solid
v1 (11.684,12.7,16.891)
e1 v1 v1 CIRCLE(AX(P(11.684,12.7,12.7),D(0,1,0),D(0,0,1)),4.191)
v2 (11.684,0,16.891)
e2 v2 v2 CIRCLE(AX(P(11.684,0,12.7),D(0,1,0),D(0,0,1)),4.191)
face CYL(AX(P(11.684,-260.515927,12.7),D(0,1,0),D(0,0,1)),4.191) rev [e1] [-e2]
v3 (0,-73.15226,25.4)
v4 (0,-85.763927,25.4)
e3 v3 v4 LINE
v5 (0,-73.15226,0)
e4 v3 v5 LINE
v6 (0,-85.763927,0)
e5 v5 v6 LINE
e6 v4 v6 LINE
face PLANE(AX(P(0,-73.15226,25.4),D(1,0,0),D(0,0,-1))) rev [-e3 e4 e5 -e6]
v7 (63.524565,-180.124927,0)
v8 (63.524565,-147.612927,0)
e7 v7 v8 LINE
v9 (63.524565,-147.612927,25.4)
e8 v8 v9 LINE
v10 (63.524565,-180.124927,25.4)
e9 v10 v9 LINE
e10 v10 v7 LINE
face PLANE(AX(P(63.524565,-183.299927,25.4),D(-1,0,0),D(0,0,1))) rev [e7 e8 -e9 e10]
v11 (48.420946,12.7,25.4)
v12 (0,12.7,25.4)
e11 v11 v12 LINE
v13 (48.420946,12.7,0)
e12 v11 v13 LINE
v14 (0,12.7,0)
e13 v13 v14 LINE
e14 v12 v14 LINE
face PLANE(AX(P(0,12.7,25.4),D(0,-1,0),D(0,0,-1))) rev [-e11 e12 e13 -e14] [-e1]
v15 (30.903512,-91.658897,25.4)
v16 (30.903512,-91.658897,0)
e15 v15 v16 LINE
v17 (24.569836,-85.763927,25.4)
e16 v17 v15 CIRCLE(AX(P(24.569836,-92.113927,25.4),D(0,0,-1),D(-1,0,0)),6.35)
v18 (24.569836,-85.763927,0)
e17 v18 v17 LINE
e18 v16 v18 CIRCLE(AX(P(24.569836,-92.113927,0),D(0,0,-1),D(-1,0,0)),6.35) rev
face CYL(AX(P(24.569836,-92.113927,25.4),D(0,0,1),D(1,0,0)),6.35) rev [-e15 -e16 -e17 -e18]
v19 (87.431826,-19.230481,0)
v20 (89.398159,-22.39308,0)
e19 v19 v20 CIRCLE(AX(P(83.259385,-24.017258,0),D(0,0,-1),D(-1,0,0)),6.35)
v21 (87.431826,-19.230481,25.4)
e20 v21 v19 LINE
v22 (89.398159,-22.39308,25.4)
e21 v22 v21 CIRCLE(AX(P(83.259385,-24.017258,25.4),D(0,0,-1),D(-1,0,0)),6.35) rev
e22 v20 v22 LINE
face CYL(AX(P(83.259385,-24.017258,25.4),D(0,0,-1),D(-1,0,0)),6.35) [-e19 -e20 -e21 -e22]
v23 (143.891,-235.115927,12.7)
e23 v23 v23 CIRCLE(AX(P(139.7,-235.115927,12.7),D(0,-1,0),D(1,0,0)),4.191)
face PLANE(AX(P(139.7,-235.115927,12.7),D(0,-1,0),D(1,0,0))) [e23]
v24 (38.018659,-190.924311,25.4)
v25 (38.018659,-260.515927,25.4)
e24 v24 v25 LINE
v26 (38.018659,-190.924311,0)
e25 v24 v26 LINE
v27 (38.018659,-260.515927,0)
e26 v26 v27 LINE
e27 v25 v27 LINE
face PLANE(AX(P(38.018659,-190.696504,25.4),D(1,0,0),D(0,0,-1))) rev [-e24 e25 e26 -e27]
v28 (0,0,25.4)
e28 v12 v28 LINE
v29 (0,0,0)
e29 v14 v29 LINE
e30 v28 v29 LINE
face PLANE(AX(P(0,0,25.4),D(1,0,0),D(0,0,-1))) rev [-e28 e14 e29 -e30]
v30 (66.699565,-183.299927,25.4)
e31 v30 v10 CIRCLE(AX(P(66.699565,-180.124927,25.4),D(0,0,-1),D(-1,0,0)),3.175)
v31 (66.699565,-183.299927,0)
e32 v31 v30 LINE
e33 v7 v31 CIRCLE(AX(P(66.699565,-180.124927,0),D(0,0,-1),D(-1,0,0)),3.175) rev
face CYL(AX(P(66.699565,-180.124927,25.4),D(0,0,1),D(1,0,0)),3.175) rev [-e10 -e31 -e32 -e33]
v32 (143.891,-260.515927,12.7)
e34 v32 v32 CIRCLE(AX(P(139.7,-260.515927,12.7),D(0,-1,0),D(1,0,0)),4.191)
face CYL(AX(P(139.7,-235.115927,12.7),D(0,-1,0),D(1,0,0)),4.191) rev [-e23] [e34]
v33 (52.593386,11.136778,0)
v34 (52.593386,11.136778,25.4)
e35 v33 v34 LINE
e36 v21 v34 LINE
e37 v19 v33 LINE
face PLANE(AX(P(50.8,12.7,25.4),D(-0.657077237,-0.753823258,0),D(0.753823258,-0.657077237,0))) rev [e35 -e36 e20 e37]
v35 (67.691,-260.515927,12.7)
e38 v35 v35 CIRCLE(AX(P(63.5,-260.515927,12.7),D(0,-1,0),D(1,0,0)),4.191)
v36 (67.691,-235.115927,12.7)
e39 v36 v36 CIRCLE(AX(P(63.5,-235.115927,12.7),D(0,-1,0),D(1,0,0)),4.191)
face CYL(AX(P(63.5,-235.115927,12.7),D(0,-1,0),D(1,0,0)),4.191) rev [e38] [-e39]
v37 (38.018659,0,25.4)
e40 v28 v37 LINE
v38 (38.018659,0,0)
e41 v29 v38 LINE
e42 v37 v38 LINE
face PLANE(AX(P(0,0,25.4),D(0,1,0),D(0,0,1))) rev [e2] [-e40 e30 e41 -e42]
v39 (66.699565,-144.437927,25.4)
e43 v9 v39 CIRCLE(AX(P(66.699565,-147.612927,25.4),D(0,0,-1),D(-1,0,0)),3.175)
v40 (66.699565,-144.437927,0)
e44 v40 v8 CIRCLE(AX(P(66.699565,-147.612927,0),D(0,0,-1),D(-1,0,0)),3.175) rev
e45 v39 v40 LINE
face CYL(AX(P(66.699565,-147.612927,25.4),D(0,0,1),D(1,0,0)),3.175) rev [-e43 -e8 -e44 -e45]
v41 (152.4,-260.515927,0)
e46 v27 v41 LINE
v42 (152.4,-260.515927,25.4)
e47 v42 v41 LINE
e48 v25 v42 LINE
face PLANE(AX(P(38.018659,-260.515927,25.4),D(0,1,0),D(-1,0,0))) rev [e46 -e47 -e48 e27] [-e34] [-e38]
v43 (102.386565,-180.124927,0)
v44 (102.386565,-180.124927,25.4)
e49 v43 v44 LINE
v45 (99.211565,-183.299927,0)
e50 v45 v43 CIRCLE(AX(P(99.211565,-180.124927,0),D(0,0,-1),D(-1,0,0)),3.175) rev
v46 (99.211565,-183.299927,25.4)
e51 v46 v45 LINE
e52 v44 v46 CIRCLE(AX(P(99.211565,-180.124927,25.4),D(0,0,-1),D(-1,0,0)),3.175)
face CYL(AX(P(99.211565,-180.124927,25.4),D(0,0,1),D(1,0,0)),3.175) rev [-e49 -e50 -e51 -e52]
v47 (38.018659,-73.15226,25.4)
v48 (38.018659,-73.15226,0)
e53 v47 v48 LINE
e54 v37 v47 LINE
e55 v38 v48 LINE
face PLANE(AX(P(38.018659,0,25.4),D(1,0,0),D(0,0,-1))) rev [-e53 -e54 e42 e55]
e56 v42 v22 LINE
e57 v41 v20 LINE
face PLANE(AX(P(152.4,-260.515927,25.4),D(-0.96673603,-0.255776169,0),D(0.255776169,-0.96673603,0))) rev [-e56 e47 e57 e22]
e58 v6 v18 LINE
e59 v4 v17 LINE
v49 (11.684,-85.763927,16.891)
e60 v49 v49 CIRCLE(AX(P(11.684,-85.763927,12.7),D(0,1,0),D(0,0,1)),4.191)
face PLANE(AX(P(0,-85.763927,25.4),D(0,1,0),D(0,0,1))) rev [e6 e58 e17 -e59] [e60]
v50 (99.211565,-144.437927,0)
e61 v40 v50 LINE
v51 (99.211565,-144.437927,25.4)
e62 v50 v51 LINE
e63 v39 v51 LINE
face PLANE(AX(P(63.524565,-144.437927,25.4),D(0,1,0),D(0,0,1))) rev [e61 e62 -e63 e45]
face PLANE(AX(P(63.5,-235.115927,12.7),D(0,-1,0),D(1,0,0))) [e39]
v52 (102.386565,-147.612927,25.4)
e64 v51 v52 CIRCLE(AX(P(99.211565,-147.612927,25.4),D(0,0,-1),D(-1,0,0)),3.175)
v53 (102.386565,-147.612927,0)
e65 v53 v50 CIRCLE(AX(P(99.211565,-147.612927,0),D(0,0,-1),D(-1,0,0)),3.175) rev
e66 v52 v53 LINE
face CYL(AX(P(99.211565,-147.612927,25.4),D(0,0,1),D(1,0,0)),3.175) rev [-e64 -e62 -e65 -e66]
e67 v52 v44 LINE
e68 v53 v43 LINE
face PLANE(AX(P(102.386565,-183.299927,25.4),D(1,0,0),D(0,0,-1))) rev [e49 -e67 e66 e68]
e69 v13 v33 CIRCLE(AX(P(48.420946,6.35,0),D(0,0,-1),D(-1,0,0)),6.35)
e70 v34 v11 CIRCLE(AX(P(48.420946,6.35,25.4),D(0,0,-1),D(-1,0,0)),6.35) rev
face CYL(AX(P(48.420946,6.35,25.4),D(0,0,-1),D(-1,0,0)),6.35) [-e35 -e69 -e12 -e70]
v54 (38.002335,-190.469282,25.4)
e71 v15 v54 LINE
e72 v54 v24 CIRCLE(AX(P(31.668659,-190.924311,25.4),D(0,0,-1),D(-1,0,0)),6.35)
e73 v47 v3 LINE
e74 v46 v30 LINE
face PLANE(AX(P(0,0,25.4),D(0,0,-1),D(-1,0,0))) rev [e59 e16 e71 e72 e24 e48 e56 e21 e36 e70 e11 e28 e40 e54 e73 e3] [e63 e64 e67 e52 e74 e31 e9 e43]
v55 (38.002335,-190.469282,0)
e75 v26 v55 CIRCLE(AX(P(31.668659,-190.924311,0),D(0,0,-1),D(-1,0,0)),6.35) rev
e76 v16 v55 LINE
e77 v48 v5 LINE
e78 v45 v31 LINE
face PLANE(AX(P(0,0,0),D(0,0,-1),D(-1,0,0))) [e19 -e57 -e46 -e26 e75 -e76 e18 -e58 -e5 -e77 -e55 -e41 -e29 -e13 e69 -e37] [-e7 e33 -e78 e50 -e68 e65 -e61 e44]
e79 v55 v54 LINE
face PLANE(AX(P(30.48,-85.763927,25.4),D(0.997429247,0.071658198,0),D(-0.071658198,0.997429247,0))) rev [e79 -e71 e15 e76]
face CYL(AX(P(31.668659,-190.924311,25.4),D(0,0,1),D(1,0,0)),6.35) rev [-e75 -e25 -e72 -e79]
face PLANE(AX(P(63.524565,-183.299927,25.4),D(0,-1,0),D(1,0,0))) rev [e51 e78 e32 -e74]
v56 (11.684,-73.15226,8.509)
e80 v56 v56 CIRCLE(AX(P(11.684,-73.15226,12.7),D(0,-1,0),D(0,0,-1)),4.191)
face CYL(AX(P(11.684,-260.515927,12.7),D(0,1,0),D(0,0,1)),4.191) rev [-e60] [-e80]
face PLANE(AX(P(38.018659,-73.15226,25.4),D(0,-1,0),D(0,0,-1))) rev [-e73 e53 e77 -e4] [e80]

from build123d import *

# Parameters (mm, degrees)
BOSS_EXTRUDE1_DEPTH = 25.4
SKETCH2_W           = 38.862
SKETCH2_H           = 38.862
CUT_EXTRUDE1_DEPTH  = 303.885239179
FILLET1_R           = 6.35
FILLET2_R           = 3.175
SKETCH3_R           = 4.191
CUT_EXTRUDE2_DEPTH  = 314.875552812
SKETCH4_R           = 4.191
CUT_EXTRUDE3_DEPTH  = 25.4


with BuildPart() as part:
    # Sketch1 → Boss-Extrude1 (new body)
    with BuildSketch(Plane.XY):
        Polygon((0, 0), (0, 12.7), (50.8, 12.7), (88.9, -20.510228633), (152.4, -260.515926793), (38.018659419, -260.515926793), (38.018659419, -190.696503564), (30.48, -85.763926793), (0, -85.763926793), (0, -73.152260366), (38.018659419, -73.152260366), (38.018659419, 0), align=None)
    extrude(amount=BOSS_EXTRUDE1_DEPTH)

    # Sketch2 → Cut-Extrude1 (cut, through all)
    with BuildSketch(Plane(origin=(0, 0, 0), x_dir=(-1, 0, 0), z_dir=(0, 0, -1))):
        with Locations((-82.955564704, -163.868926793)):
            Rectangle(SKETCH2_W, SKETCH2_H)
    extrude(amount=-CUT_EXTRUDE1_DEPTH, mode=Mode.SUBTRACT)

    # Fillet1
    # the kernel refuses this fillet: 6.35 mm, written as the material it adds along each edge
    with BuildSketch(Plane(origin=(38.018659419, -190.696503564, 0), x_dir=(0, -1, 0), z_dir=(0, 0, 1))) as fillet1_piece_1:
        with BuildLine():
            CenterArc((FILLET1_R * 0.0358752122725, -FILLET1_R), FILLET1_R, 90, 4.109234206)
            Line((-FILLET1_R * 0.0357829859603, -FILLET1_R * 0.00257075307266), (0, 0))
            Line((0, 0), (FILLET1_R * 0.0358752122725, 0))
        make_face()
    extrude(amount=25.4)
    with BuildSketch(Plane(origin=(30.48, -85.763926793, 0), x_dir=(-1, 0, 0), z_dir=(0, 0, 1))) as fillet1_piece_2:
        with BuildLine():
            CenterArc((FILLET1_R * 0.930734490318, FILLET1_R), FILLET1_R, 184.109234206, 85.890765794)
            Line((-FILLET1_R * 0.0666947566093, FILLET1_R * 0.928341801767), (0, 0))
            Line((0, 0), (FILLET1_R * 0.930734490318, 0))
        make_face()
    extrude(amount=25.4)
    # the kernel refuses this fillet: 6.35 mm, written as the material it takes off along each edge
    with BuildSketch(Plane(origin=(50.8, 12.7, -5.947635314), x_dir=(-1, 0, 0), z_dir=(0, 0, 1))) as fillet1_2_piece_1:
        with BuildLine():
            CenterArc((FILLET1_R * 0.374654193004, FILLET1_R), FILLET1_R, 228.922654606, 41.077345394)
            Line((-FILLET1_R * 0.282423044355, FILLET1_R * 0.246176742103), (0, 0))
            Line((0, 0), (FILLET1_R * 0.374654193004, 0))
        make_face()
    extrude(amount=37.295270628, mode=Mode.SUBTRACT)
    with BuildSketch(Plane(origin=(88.9, -20.510228633, -4.869092834), x_dir=(-0.7538232578965339, 0.6570772373581782, 0), z_dir=(0, 0, 1))) as fillet1_2_piece_2:
        with BuildLine():
            CenterArc((FILLET1_R * 0.306714509228, FILLET1_R), FILLET1_R, 235.896927034, 34.103072966)
            Line((-FILLET1_R * 0.253968896194, FILLET1_R * 0.171969735526), (0, 0))
            Line((0, 0), (FILLET1_R * 0.306714509228, 0))
        make_face()
    extrude(amount=35.138185668, mode=Mode.SUBTRACT)

    # Fillet2
    fillet2_edges = [part.edges().sort_by_distance(p)[0] for p in [
        (63.524564704, -144.437926793, 12.7),
        (63.524564704, -183.299926793, 12.7),
        (102.386564704, -183.299926793, 12.7),
        (102.386564704, -144.437926793, 12.7),
    ]]
    fillet(fillet2_edges, radius=FILLET2_R)

    # Sketch3 → Cut-Extrude2 (cut, through all)
    with BuildSketch(Plane(origin=(0, 12.7, 0), x_dir=(1, 0, 0), z_dir=(0, 1, 0))):
        with Locations(Location((11.684, -12.7, 0), (0, 0, 270))):
            Circle(SKETCH3_R)
    extrude(amount=-CUT_EXTRUDE2_DEPTH, mode=Mode.SUBTRACT)

    # Sketch4 → Cut-Extrude3 (cut)
    with BuildSketch(Plane.XZ.offset(260.515926793)):
        with Locations((139.7, 12.7)):
            Circle(SKETCH4_R)
        with Locations((63.5, 12.7)):
            Circle(SKETCH4_R)
    extrude(amount=-CUT_EXTRUDE3_DEPTH, mode=Mode.SUBTRACT)


solid = part.part
